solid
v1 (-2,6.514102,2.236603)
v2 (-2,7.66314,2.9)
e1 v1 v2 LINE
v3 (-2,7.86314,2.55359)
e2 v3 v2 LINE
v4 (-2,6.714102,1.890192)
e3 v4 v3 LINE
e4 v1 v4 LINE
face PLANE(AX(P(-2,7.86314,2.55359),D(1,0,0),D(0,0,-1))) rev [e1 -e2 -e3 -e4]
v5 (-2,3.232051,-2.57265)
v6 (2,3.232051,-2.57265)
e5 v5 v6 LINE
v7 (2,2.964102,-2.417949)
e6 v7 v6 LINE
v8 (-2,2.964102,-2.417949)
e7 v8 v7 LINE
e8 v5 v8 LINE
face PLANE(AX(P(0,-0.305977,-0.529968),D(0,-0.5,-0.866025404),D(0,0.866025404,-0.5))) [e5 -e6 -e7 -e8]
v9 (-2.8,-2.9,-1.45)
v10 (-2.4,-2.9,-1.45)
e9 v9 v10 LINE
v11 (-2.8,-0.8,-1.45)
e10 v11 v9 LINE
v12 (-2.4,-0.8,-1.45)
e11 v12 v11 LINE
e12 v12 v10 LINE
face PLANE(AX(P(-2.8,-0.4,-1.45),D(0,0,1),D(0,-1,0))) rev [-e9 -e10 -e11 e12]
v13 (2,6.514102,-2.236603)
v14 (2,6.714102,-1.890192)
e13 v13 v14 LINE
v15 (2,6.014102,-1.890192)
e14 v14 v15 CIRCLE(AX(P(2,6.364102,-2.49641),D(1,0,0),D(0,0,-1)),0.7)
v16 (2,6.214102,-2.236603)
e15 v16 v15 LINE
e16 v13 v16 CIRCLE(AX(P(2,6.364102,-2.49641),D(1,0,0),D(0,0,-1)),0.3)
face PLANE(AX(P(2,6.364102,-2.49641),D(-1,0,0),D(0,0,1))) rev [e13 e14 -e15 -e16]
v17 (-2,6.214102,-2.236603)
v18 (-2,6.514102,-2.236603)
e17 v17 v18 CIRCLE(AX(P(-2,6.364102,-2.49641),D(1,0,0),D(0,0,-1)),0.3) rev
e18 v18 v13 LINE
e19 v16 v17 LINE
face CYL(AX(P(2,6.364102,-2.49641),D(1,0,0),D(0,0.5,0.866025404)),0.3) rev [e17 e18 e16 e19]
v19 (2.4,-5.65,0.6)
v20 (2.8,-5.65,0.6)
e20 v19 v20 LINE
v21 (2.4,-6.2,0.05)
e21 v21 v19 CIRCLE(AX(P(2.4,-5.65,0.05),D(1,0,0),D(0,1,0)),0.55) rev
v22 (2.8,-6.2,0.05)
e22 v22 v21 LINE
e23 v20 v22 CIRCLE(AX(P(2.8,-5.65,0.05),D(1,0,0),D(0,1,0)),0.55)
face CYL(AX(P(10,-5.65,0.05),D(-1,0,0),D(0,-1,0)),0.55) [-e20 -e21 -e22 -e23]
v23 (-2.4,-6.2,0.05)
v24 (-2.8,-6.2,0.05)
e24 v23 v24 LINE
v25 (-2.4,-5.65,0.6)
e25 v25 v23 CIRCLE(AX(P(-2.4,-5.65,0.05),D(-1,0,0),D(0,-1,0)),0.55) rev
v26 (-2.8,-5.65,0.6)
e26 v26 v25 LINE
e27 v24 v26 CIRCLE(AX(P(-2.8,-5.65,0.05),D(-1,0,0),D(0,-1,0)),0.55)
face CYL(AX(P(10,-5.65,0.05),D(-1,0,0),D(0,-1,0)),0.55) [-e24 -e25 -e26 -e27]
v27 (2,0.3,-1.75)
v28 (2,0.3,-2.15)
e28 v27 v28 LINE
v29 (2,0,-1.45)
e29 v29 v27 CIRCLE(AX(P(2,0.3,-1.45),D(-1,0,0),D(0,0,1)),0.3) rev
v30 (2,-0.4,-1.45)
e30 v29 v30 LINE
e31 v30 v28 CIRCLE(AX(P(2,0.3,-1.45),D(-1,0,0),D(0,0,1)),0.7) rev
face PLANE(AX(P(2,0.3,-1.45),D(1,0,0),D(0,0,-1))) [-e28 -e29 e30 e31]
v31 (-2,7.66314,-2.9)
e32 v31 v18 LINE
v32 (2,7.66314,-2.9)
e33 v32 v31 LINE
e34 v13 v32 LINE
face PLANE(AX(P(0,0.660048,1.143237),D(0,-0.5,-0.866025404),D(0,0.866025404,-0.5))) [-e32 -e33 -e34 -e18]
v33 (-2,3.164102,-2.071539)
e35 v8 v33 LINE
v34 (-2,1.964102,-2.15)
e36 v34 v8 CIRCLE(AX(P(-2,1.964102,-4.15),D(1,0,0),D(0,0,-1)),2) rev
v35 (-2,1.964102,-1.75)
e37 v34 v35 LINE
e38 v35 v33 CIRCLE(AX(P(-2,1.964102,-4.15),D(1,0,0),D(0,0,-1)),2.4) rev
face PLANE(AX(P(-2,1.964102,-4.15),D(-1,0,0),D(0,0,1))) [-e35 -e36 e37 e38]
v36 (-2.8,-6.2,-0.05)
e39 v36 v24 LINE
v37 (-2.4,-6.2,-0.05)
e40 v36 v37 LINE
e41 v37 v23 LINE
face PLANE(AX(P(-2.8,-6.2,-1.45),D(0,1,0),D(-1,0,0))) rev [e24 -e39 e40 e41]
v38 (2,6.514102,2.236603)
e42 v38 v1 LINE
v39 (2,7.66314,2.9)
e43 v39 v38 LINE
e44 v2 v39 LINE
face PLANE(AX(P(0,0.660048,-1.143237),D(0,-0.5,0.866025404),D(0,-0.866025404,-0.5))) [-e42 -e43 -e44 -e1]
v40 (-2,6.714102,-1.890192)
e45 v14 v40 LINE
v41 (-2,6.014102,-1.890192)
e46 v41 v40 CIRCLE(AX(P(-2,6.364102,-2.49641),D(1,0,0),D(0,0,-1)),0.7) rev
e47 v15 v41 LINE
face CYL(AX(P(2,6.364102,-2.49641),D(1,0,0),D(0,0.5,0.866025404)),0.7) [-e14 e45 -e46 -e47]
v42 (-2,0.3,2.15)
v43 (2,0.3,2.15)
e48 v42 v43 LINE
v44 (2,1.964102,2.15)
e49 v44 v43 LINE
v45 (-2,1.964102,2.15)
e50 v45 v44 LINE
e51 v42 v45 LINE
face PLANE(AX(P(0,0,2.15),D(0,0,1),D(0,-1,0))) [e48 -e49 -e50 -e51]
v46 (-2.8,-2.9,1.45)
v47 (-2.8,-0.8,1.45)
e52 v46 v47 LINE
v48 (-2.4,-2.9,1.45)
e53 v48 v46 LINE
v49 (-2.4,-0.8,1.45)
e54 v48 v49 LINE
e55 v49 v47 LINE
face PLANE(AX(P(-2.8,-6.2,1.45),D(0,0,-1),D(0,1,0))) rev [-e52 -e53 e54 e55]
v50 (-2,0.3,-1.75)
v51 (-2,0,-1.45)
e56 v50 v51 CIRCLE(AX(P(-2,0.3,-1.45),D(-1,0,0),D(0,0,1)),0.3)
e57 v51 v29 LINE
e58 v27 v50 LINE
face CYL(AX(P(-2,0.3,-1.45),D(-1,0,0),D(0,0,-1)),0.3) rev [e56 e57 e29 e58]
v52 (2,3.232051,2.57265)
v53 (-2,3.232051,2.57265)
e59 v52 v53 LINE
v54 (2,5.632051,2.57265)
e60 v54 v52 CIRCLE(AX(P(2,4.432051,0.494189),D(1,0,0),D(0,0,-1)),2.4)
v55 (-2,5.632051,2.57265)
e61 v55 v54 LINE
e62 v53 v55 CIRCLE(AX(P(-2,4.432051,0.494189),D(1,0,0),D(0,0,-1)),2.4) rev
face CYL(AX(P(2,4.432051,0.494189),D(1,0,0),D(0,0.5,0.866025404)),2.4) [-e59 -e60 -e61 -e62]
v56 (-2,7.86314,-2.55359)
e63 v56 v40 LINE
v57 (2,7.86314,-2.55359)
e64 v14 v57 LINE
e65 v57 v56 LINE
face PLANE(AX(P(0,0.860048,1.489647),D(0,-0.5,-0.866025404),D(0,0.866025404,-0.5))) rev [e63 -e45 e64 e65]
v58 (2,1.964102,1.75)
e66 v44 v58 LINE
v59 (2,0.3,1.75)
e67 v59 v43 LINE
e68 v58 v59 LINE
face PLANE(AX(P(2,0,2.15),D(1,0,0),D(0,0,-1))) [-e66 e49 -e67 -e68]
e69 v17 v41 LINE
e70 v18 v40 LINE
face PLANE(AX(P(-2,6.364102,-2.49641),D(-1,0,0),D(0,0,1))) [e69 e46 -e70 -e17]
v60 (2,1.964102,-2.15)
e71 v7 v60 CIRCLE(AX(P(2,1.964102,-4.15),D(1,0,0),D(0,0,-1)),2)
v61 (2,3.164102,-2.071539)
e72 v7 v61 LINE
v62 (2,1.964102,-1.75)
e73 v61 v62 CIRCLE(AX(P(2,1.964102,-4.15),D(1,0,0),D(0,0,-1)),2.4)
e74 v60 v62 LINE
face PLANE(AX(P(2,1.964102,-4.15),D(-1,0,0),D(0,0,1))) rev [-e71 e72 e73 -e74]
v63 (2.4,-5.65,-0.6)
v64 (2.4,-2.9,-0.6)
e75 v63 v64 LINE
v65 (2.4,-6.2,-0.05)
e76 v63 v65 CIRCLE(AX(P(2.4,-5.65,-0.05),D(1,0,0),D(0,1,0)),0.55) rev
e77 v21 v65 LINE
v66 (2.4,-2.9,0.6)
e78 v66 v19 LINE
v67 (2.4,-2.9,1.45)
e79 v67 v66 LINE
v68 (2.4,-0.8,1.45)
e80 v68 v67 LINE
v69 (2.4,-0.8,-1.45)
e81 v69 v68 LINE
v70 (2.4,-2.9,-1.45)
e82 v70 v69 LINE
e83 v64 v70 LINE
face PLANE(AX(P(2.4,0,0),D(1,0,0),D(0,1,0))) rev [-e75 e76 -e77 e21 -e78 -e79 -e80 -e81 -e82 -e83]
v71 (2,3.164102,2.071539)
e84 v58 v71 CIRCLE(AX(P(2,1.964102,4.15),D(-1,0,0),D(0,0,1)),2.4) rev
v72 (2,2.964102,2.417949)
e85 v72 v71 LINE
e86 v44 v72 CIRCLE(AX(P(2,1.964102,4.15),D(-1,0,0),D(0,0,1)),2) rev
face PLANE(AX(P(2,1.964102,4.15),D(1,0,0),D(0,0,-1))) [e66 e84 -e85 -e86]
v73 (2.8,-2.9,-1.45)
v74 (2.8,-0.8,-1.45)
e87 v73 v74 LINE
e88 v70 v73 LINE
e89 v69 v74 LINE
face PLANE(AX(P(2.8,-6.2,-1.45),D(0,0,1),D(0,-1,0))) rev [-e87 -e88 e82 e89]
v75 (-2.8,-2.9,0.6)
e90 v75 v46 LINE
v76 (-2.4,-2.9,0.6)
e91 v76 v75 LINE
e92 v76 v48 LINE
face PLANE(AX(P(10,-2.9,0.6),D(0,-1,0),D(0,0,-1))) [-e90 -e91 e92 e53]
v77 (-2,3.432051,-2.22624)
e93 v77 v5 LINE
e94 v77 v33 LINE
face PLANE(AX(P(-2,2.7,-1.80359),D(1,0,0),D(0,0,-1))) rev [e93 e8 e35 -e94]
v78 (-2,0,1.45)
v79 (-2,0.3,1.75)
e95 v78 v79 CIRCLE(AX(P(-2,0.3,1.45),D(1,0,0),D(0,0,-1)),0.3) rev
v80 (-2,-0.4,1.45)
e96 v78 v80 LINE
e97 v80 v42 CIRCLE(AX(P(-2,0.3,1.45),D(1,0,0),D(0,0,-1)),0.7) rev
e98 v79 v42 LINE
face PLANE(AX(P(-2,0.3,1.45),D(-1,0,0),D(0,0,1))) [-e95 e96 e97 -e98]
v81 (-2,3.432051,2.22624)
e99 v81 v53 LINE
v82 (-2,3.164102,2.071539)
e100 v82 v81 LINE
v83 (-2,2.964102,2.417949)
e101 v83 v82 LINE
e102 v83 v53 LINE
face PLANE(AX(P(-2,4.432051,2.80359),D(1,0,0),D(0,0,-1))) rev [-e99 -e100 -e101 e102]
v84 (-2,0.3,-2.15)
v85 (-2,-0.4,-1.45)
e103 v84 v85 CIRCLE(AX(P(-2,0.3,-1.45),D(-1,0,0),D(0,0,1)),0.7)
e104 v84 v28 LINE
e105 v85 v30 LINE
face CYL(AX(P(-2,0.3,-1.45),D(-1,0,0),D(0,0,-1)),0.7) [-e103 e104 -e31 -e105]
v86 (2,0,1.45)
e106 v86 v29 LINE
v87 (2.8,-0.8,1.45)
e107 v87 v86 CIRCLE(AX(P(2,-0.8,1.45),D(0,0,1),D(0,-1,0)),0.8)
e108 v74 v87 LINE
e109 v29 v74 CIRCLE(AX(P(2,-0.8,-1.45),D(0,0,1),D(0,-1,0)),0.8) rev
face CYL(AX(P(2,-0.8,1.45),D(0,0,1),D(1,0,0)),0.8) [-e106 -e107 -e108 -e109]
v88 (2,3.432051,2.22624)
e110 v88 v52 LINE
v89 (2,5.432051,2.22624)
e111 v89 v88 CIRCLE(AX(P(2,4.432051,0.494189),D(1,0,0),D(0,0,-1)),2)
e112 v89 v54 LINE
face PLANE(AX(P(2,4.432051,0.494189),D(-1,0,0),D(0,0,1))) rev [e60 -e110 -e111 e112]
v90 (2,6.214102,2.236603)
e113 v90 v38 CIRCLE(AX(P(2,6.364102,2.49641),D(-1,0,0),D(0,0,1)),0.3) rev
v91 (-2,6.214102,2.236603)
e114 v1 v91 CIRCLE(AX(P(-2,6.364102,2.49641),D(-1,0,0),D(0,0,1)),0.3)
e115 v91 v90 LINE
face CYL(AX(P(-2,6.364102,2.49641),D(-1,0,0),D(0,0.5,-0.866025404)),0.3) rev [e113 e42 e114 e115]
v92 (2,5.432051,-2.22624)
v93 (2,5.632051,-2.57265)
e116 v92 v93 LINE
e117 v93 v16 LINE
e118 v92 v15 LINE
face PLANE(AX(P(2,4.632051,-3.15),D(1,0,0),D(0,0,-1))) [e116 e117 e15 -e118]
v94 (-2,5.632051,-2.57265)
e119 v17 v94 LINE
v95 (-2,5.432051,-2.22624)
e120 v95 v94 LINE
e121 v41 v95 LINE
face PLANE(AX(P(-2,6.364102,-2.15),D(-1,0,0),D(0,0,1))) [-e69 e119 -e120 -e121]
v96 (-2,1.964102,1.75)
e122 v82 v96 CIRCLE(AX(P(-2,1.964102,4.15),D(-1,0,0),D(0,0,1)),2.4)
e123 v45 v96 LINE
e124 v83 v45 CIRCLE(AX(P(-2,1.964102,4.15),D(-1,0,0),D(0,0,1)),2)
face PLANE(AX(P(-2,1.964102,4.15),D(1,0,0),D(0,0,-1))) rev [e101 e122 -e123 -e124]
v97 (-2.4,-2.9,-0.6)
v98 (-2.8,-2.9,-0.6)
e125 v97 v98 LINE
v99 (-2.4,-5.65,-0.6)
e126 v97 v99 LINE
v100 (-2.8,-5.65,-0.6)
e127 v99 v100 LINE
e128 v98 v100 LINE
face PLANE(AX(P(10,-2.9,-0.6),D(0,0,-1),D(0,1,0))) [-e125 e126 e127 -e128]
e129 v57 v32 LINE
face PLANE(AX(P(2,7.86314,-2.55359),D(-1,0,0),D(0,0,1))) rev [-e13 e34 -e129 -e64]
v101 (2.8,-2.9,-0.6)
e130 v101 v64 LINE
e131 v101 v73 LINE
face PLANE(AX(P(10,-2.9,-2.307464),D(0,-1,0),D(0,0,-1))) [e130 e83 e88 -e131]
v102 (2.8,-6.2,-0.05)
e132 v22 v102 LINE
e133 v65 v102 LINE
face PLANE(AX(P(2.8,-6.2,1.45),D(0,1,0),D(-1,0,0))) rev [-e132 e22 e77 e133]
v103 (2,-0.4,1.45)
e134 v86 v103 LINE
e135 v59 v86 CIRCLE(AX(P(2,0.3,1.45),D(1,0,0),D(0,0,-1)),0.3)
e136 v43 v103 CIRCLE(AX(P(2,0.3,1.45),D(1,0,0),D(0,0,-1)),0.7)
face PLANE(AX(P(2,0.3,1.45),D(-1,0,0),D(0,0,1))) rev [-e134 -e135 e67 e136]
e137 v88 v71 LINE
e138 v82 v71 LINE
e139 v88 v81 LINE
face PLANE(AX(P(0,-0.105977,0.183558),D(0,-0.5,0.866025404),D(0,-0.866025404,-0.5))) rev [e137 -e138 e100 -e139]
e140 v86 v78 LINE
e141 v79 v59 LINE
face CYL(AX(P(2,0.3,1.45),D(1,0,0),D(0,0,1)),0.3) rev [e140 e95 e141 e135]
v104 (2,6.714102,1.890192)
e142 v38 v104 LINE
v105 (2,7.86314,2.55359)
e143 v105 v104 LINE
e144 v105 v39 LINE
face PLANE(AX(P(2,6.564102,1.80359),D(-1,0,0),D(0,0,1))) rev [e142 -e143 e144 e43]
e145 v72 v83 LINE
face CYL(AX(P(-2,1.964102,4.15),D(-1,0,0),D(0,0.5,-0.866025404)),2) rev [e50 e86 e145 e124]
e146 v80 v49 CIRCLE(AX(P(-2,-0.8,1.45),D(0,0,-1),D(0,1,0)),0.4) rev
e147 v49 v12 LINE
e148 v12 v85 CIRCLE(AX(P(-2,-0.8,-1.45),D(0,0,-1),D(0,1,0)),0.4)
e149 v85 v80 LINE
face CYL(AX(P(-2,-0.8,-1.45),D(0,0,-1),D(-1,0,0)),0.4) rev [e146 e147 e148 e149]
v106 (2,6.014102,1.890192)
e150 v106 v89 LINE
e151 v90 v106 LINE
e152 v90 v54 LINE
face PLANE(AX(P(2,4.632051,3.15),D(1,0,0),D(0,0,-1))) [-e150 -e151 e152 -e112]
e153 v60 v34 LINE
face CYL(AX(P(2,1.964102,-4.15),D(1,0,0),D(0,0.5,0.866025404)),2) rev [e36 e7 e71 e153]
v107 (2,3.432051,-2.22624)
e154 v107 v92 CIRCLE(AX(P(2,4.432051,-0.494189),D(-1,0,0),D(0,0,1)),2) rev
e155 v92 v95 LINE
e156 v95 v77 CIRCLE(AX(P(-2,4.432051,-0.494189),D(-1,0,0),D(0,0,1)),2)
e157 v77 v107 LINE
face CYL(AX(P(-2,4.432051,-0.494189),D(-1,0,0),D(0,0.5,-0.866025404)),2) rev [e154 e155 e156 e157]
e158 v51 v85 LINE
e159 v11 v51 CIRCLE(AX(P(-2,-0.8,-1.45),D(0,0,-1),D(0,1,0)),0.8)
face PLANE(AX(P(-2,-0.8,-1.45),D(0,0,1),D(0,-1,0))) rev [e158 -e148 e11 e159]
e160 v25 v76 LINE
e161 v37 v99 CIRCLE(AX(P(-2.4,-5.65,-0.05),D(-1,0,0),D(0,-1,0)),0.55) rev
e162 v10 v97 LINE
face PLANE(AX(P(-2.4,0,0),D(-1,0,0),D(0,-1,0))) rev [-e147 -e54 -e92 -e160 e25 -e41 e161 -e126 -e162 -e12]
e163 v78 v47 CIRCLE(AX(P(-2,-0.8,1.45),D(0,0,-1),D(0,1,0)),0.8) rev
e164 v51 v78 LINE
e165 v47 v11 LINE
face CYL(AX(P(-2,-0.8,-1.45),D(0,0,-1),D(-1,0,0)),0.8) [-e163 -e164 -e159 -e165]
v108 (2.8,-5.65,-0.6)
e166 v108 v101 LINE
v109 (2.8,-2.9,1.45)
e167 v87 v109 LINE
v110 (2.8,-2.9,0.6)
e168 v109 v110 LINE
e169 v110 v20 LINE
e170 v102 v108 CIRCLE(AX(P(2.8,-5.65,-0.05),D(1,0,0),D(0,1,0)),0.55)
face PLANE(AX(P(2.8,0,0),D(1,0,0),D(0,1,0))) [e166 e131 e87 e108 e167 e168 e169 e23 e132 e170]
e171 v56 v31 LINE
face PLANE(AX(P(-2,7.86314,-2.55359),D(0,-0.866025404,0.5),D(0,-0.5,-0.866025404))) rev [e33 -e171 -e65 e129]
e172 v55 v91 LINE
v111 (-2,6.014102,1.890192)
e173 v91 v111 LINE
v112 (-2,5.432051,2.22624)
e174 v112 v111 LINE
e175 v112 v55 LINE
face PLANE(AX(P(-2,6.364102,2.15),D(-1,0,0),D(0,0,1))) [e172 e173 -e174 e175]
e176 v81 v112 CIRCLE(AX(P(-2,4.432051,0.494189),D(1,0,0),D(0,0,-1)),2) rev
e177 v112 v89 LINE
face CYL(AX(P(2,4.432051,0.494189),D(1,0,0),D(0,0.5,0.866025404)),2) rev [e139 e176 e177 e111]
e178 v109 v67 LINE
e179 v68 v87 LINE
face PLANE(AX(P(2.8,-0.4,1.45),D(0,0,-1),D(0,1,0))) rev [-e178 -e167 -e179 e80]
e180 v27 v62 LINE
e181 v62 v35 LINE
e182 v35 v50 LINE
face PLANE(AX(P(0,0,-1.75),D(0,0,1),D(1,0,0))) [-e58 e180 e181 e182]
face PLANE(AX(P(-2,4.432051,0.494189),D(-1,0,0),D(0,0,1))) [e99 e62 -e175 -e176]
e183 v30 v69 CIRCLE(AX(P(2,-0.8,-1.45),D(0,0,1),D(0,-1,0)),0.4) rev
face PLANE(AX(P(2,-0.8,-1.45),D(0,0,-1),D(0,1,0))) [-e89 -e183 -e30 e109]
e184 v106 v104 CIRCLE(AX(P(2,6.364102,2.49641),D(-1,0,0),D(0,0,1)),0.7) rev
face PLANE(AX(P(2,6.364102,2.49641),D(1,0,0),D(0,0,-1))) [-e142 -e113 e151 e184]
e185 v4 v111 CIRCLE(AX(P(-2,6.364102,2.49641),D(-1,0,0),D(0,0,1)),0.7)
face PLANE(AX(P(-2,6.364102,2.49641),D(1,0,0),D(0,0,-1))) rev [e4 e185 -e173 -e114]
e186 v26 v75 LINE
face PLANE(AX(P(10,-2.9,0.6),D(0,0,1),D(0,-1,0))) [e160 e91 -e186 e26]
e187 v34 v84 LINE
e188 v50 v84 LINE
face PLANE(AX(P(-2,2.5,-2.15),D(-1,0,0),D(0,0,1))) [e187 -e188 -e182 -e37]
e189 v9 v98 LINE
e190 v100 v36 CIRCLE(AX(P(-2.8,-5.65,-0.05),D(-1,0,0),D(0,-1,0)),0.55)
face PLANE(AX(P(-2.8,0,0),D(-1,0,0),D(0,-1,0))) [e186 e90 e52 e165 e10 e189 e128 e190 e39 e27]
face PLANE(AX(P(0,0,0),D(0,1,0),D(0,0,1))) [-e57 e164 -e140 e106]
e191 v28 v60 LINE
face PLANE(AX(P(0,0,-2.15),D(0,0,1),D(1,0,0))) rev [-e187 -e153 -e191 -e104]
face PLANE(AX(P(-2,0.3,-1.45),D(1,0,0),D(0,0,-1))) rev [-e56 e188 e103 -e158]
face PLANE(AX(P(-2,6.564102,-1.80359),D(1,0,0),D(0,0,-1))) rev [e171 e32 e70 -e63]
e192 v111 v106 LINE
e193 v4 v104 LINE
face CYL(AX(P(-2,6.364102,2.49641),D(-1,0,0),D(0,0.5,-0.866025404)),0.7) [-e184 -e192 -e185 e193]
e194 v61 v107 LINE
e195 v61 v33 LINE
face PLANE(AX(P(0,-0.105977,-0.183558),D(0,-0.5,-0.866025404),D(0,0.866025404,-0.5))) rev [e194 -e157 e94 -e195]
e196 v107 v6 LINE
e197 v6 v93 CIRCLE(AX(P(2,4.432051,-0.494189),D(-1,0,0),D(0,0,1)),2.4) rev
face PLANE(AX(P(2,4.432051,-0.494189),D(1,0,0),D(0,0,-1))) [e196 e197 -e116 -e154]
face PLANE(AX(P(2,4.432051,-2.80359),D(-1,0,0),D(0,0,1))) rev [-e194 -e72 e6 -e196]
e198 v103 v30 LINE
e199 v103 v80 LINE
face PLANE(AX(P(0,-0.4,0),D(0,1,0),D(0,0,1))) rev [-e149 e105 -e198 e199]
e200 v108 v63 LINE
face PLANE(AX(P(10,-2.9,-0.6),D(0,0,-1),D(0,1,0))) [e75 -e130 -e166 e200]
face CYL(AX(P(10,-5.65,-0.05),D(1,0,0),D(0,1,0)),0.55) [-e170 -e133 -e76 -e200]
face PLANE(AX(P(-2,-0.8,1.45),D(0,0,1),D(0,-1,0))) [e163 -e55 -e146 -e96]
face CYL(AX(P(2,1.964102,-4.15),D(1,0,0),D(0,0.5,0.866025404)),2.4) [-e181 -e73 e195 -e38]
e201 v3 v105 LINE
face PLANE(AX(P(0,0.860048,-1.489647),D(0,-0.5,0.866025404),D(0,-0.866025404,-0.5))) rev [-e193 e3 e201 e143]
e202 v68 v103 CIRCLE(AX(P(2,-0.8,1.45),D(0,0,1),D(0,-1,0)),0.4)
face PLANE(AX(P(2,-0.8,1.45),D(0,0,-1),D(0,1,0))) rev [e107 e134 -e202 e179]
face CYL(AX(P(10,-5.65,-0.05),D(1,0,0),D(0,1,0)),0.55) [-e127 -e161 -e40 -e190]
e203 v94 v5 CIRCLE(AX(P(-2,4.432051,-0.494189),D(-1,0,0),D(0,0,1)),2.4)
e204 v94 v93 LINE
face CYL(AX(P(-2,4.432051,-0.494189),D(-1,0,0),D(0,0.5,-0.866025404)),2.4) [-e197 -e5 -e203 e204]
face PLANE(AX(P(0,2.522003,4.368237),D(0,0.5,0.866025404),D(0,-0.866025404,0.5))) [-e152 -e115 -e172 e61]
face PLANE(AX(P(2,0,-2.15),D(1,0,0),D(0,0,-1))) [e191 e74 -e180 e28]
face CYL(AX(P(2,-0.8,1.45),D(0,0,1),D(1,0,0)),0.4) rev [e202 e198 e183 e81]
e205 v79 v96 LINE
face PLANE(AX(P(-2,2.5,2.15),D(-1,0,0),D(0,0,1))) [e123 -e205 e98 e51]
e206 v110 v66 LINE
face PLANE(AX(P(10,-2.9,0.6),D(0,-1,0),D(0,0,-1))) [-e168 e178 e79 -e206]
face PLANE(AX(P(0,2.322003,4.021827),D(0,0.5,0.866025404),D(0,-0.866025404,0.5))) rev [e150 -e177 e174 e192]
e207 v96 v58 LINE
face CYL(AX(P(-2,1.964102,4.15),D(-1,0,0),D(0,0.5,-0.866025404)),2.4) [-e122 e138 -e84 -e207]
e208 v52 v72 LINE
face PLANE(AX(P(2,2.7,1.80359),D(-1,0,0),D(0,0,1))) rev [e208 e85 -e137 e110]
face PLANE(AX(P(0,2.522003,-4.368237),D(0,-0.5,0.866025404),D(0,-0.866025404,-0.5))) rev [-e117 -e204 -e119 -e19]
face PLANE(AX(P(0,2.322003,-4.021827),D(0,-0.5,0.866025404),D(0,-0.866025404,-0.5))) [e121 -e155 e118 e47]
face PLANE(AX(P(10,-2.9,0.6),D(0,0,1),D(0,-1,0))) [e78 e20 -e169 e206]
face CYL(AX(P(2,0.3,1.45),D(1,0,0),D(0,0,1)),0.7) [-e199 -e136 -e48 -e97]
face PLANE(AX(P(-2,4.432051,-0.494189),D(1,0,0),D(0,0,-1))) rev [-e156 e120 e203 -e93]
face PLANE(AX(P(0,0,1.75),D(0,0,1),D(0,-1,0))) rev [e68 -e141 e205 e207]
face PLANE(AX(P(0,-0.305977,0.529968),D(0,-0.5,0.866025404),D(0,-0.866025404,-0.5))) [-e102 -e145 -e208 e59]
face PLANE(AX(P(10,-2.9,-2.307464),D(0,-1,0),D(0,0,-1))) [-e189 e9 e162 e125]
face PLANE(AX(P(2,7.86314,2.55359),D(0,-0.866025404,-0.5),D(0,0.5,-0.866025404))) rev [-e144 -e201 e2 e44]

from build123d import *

# Parameters (mm, degrees)
SKETCH_1_W                         = 4
SKETCH_1_H                         = 3.5
SM_BASE_FLANGE_1_DEPTH             = 0.4
SM_EDGE_FLANGE_1_STRIP_W           = 2.2
SM_EDGE_FLANGE_1_STRIP_H           = 0.4
SM_EDGE_FLANGE_1_STRIP_CUT_DEPTH   = 4
SM_EDGE_FLANGE_1_STRIP_2_W         = 2.2
SM_EDGE_FLANGE_1_STRIP_2_H         = 0.4
SM_EDGE_FLANGE_1_STRIP_CUT_2_DEPTH = 4
SM_EDGE_FLANGE_1_DEPTH             = 4
SM_EDGE_FLANGE_1_BEND_DEPTH        = 4
SM_EDGE_FLANGE_2_STRIP_CUT_DEPTH   = 4
SM_EDGE_FLANGE_2_STRIP_CUT_2_DEPTH = 4
SM_EDGE_FLANGE_2_DEPTH             = 4
SM_EDGE_FLANGE_2_BEND_DEPTH        = 4
SM_START                           = -2
SM_EDGE_FLANGE_3_DEPTH             = 4
SM_EDGE_FLANGE_3_2_DEPTH           = 4
SM_EDGE_FLANGE_4_STRIP_CUT_DEPTH   = 4
SM_EDGE_FLANGE_4_STRIP_CUT_2_DEPTH = 4
SM_EDGE_FLANGE_4_DEPTH             = 4
SM_EDGE_FLANGE_4_BEND_DEPTH        = 4
SM_EDGE_FLANGE_5_DEPTH             = 2.9
SM_EDGE_FLANGE_5_BEND_DEPTH        = 2.9
CUT_EXTRUDE_1_DEPTH                = 10
CUT_EXTRUDE_1_DEPTH_BACK           = 10
SKETCH_36_W                        = 1.707463823
SKETCH_36_H                        = 4.810050527
SKETCH_36_W_2                      = 1.878862713
FILLET_1_R                         = 0.55


# Read off the part's stored shape, not the designer's step: Ребро-кромка3
# Sheet-metal steps are written as plain solids
with BuildPart() as part:
    # Sketch 1 → Базовая кромка1 (new body)
    with BuildSketch(Plane(origin=(0, 0, 0), x_dir=(1, 0, 0), z_dir=(0, 1, 0))):
        Rectangle(SKETCH_1_W, SKETCH_1_H)
    extrude(amount=-SM_BASE_FLANGE_1_DEPTH)

    # Ребро-кромка1 strip (across the edge) → Ребро-кромка1 strip cut (cut)
    with BuildSketch(Plane(origin=(-2, 0, 1.75), x_dir=(0, 0, -1), z_dir=(1, 0, 0))):
        with Locations((-0.8, -0.2)):
            Rectangle(SM_EDGE_FLANGE_1_STRIP_W, SM_EDGE_FLANGE_1_STRIP_H)
    extrude(amount=SM_EDGE_FLANGE_1_STRIP_CUT_DEPTH, mode=Mode.SUBTRACT)

    # Ребро-кромка1 strip 2 (across the edge) → Ребро-кромка1 strip cut 2 (cut)
    with BuildSketch(Plane(origin=(2, 0, -1.75), x_dir=(0, 0, 1), z_dir=(-1, 0, 0))):
        with Locations((-0.8, -0.2)):
            Rectangle(SM_EDGE_FLANGE_1_STRIP_2_W, SM_EDGE_FLANGE_1_STRIP_2_H)
    extrude(amount=SM_EDGE_FLANGE_1_STRIP_CUT_2_DEPTH, mode=Mode.SUBTRACT)

    # Ребро-кромка1 section (across the edge) → Ребро-кромка1 (add)
    with BuildSketch(Plane(origin=(-2, 0, 1.75), x_dir=(0, 0, -1), z_dir=(1, 0, 0))):
        with BuildLine():
            Line((-0.4, 0.3), (-0.4, 2.5))
            Line((-0.4, 2.5), (0, 2.5))
            Line((0, 2.5), (0, 0.3))
            ThreePointArc((0, 0.3), (0.087867966, 0.087867966), (0.3, 0))
            Line((0.3, 0), (0.3, -0.4))
            ThreePointArc((0.3, -0.4), (-0.194974747, -0.194974747), (-0.4, 0.3))
        make_face()
    extrude(amount=SM_EDGE_FLANGE_1_DEPTH)

    # Ребро-кромка1 section 2 (across the edge) → Ребро-кромка1 bend (add)
    with BuildSketch(Plane(origin=(2, 0, -1.75), x_dir=(0, 0, 1), z_dir=(-1, 0, 0))):
        with BuildLine():
            Line((-0.4, 0.3), (-0.4, 2.5))
            Line((-0.4, 2.5), (0, 2.5))
            Line((0, 2.5), (0, 0.3))
            ThreePointArc((0, 0.3), (0.087867966, 0.087867966), (0.3, 0))
            Line((0.3, 0), (0.3, -0.4))
            ThreePointArc((0.3, -0.4), (-0.194974747, -0.194974747), (-0.4, 0.3))
        make_face()
    extrude(amount=SM_EDGE_FLANGE_1_BEND_DEPTH)

    # Ребро-кромка2 strip (across the edge) → Ребро-кромка2 strip cut (cut)
    with BuildSketch(Plane(origin=(2, 2.5, 2.15), x_dir=(0, -0.49999999999999795, 0.8660254037844398), z_dir=(-1, 0, 0))):
        Polygon((-2.878460969, 4.185640646), (-0.078460969, -0.664101615), (0.267949192, -0.464101615), (-2.532050808, 4.385640646), align=None)
    extrude(amount=SM_EDGE_FLANGE_2_STRIP_CUT_DEPTH, mode=Mode.SUBTRACT)

    # Ребро-кромка2 strip 2 (across the edge) → Ребро-кромка2 strip cut 2 (cut)
    with BuildSketch(Plane(origin=(-2, 2.5, -2.15), x_dir=(0, -0.49999999999999495, -0.8660254037844416), z_dir=(1, 0, 0))):
        Polygon((-2.878460969, 4.185640646), (-0.078460969, -0.664101615), (0.267949192, -0.464101615), (-2.532050808, 4.385640646), align=None)
    extrude(amount=SM_EDGE_FLANGE_2_STRIP_CUT_2_DEPTH, mode=Mode.SUBTRACT)

    # Ребро-кромка2 section (across the edge) → Ребро-кромка2 (add)
    with BuildSketch(Plane(origin=(2, 2.5, 2.15), x_dir=(0, -0.49999999999999795, 0.8660254037844398), z_dir=(-1, 0, 0))):
        with BuildLine():
            Line((-0.4, 0.535898385), (-0.4, 2))
            Line((-0.4, 2), (0, 2))
            Line((0, 2), (0, 0.535898385))
            ThreePointArc((0, 0.535898385), (0.068148347, 0.018260295), (0.267949192, -0.464101615))
            Line((0.267949192, -0.464101615), (-0.078460969, -0.664101615))
            ThreePointArc((-0.078460969, -0.664101615), (-0.318221983, -0.085267323), (-0.4, 0.535898385))
        make_face()
    extrude(amount=SM_EDGE_FLANGE_2_DEPTH)

    # Ребро-кромка2 section 2 (across the edge) → Ребро-кромка2 bend (add)
    with BuildSketch(Plane(origin=(-2, 2.5, -2.15), x_dir=(0, -0.49999999999999495, -0.8660254037844416), z_dir=(1, 0, 0))):
        with BuildLine():
            Line((-0.4, 0.535898385), (-0.4, 2))
            Line((-0.4, 2), (0, 2))
            Line((0, 2), (0, 0.535898385))
            ThreePointArc((0, 0.535898385), (0.068148347, 0.018260295), (0.267949192, -0.464101615))
            Line((0.267949192, -0.464101615), (-0.078460969, -0.664101615))
            ThreePointArc((-0.078460969, -0.664101615), (-0.318221983, -0.085267323), (-0.4, 0.535898385))
        make_face()
    extrude(amount=SM_EDGE_FLANGE_2_BEND_DEPTH)

    # Ребро-кромка3 outline → Ребро-кромка3 (cut)
    with BuildSketch(Plane.YZ.offset(SM_START)):
        with BuildLine():
            ThreePointArc((3.232050808, 2.572649731), (3.785814556, 2.80554739), (4.380068552, 2.893625747))
            Line((4.380068552, 2.893625747), (4.232050808, 3.15))
            Line((4.232050808, 3.15), (3.232050808, 2.572649731))
        make_face()
        with BuildLine():
            Line((4.232050808, -3.15), (4.380068552, -2.893625747))
            ThreePointArc((4.380068552, -2.893625747), (3.785814556, -2.80554739), (3.232050808, -2.572649731))
            Line((3.232050808, -2.572649731), (4.232050808, -3.15))
        make_face()
    extrude(amount=SM_EDGE_FLANGE_3_DEPTH, mode=Mode.SUBTRACT)

    # Sm Edge Flange 3 2 outline → Sm Edge Flange 3 2 (add)
    with BuildSketch(Plane.YZ.offset(SM_START)):
        with BuildLine():
            Line((6.364101615, 2.15), (5.632050808, 2.572649731))
            ThreePointArc((5.632050808, 2.572649731), (5.028073111, 2.819002177), (4.380068552, 2.893625747))
            Line((4.380068552, 2.893625747), (4.432050808, 2.803589838))
            Line((4.432050808, 2.803589838), (3.432050808, 2.226239569))
            ThreePointArc((3.432050808, 2.226239569), (4.432050808, 2.494188762), (5.432050808, 2.226239569))
            Line((5.432050808, 2.226239569), (6.164101615, 1.803589838))
            Line((6.164101615, 1.803589838), (6.364101615, 2.15))
        make_face()
        with BuildLine():
            ThreePointArc((4.380068552, -2.893625747), (5.028073111, -2.819002177), (5.632050808, -2.572649731))
            Line((5.632050808, -2.572649731), (6.364101615, -2.15))
            Line((6.364101615, -2.15), (6.164101615, -1.803589838))
            Line((6.164101615, -1.803589838), (5.432050808, -2.226239569))
            ThreePointArc((5.432050808, -2.226239569), (4.432050808, -2.494188762), (3.432050808, -2.226239569))
            Line((3.432050808, -2.226239569), (4.432050808, -2.803589838))
            Line((4.432050808, -2.803589838), (4.380068552, -2.893625747))
        make_face()
    extrude(amount=SM_EDGE_FLANGE_3_2_DEPTH)

    # Ребро-кромка4 strip (across the edge) → Ребро-кромка4 strip cut (cut)
    with BuildSketch(Plane(origin=(2, 6.364101615, 2.15), x_dir=(0, -0.4999999999999979, 0.8660254037844399), z_dir=(-1, 0, 0))):
        Polygon((-1.955255888, 0.666987298), (-0.05, -0.433012702), (0.15, -0.08660254), (-1.755255888, 1.01339746), align=None)
    extrude(amount=SM_EDGE_FLANGE_4_STRIP_CUT_DEPTH, mode=Mode.SUBTRACT)

    # Ребро-кромка4 strip 2 (across the edge) → Ребро-кромка4 strip cut 2 (cut)
    with BuildSketch(Plane(origin=(-2, 6.364101615, -2.15), x_dir=(0, -0.4999999999999948, -0.8660254037844417), z_dir=(1, 0, 0))):
        Polygon((-1.955255888, 0.666987298), (-0.05, -0.433012702), (0.15, -0.08660254), (-1.755255888, 1.01339746), align=None)
    extrude(amount=SM_EDGE_FLANGE_4_STRIP_CUT_2_DEPTH, mode=Mode.SUBTRACT)

    # Ребро-кромка4 section (across the edge) → Ребро-кромка4 (add)
    with BuildSketch(Plane(origin=(2, 6.364101615, 2.15), x_dir=(0, -0.4999999999999979, 0.8660254037844399), z_dir=(-1, 0, 0))):
        with BuildLine():
            Line((-0.4, 0.173205081), (-0.4, 1.5))
            Line((-0.4, 1.5), (0, 1.5))
            Line((0, 1.5), (0, 0.173205081))
            ThreePointArc((0, 0.173205081), (0.040192379, 0.023205081), (0.15, -0.08660254))
            Line((0.15, -0.08660254), (-0.05, -0.433012702))
            ThreePointArc((-0.05, -0.433012702), (-0.306217783, -0.176794919), (-0.4, 0.173205081))
        make_face()
    extrude(amount=SM_EDGE_FLANGE_4_DEPTH)

    # Ребро-кромка4 section 2 (across the edge) → Ребро-кромка4 bend (add)
    with BuildSketch(Plane(origin=(-2, 6.364101615, -2.15), x_dir=(0, -0.4999999999999948, -0.8660254037844417), z_dir=(1, 0, 0))):
        with BuildLine():
            Line((-0.4, 0.173205081), (-0.4, 1.5))
            Line((-0.4, 1.5), (0, 1.5))
            Line((0, 1.5), (0, 0.173205081))
            ThreePointArc((0, 0.173205081), (0.040192379, 0.023205081), (0.15, -0.08660254))
            Line((0.15, -0.08660254), (-0.05, -0.433012702))
            ThreePointArc((-0.05, -0.433012702), (-0.306217783, -0.176794919), (-0.4, 0.173205081))
        make_face()
    extrude(amount=SM_EDGE_FLANGE_4_BEND_DEPTH)

    # Ребро-кромка5 section (across the edge) → Ребро-кромка5 (add)
    with BuildSketch(Plane(origin=(2.4, -0.4, -1.45), x_dir=(-1, 0, 0), z_dir=(0, 0, 1))):
        with BuildLine():
            Line((-0.4, 0.4), (-0.4, 5.8))
            Line((-0.4, 5.8), (0, 5.8))
            Line((0, 5.8), (0, 0.4))
            ThreePointArc((0, 0.4), (0.117157288, 0.117157288), (0.4, 0))
            Line((0.4, 0), (0.4, -0.4))
            ThreePointArc((0.4, -0.4), (-0.165685425, -0.165685425), (-0.4, 0.4))
        make_face()
    extrude(amount=SM_EDGE_FLANGE_5_DEPTH)

    # Ребро-кромка5 section 2 (across the edge) → Ребро-кромка5 bend (add)
    with BuildSketch(Plane(origin=(-2.4, -0.4, 1.45), x_dir=(1, 0, 0), z_dir=(0, 0, -1))):
        with BuildLine():
            Line((-0.4, 0.4), (-0.4, 5.8))
            Line((-0.4, 5.8), (0, 5.8))
            Line((0, 5.8), (0, 0.4))
            ThreePointArc((0, 0.4), (0.117157288, 0.117157288), (0.4, 0))
            Line((0.4, 0), (0.4, -0.4))
            ThreePointArc((0.4, -0.4), (-0.165685425, -0.165685425), (-0.4, 0.4))
        make_face()
    extrude(amount=SM_EDGE_FLANGE_5_BEND_DEPTH)

    # Эскиз36 → Вырез-Вытянуть1 (cut, two sides: drawn at the far end of the back side and taken through both)
    with BuildSketch(Plane(origin=(0, 0, 0), x_dir=(0, 0, -1), z_dir=(1, 0, 0)).offset(-CUT_EXTRUDE_1_DEPTH_BACK)):
        with Locations((1.453731912, -5.305025264)):
            Rectangle(SKETCH_36_W, SKETCH_36_H)
        with Locations((-1.539431357, -5.305025264)):
            Rectangle(SKETCH_36_W_2, SKETCH_36_H)
    extrude(amount=CUT_EXTRUDE_1_DEPTH + CUT_EXTRUDE_1_DEPTH_BACK, mode=Mode.SUBTRACT)

    # Скругление1
    fillet_1_edges = [part.edges().sort_by_distance(p)[0] for p in [
        (-2.6, -6.2, -0.6),
        (2.6, -6.2, -0.6),
        (-2.6, -6.2, 0.6),
        (2.6, -6.2, 0.6),
    ]]
    fillet(fillet_1_edges, radius=FILLET_1_R)


solid = part.part
